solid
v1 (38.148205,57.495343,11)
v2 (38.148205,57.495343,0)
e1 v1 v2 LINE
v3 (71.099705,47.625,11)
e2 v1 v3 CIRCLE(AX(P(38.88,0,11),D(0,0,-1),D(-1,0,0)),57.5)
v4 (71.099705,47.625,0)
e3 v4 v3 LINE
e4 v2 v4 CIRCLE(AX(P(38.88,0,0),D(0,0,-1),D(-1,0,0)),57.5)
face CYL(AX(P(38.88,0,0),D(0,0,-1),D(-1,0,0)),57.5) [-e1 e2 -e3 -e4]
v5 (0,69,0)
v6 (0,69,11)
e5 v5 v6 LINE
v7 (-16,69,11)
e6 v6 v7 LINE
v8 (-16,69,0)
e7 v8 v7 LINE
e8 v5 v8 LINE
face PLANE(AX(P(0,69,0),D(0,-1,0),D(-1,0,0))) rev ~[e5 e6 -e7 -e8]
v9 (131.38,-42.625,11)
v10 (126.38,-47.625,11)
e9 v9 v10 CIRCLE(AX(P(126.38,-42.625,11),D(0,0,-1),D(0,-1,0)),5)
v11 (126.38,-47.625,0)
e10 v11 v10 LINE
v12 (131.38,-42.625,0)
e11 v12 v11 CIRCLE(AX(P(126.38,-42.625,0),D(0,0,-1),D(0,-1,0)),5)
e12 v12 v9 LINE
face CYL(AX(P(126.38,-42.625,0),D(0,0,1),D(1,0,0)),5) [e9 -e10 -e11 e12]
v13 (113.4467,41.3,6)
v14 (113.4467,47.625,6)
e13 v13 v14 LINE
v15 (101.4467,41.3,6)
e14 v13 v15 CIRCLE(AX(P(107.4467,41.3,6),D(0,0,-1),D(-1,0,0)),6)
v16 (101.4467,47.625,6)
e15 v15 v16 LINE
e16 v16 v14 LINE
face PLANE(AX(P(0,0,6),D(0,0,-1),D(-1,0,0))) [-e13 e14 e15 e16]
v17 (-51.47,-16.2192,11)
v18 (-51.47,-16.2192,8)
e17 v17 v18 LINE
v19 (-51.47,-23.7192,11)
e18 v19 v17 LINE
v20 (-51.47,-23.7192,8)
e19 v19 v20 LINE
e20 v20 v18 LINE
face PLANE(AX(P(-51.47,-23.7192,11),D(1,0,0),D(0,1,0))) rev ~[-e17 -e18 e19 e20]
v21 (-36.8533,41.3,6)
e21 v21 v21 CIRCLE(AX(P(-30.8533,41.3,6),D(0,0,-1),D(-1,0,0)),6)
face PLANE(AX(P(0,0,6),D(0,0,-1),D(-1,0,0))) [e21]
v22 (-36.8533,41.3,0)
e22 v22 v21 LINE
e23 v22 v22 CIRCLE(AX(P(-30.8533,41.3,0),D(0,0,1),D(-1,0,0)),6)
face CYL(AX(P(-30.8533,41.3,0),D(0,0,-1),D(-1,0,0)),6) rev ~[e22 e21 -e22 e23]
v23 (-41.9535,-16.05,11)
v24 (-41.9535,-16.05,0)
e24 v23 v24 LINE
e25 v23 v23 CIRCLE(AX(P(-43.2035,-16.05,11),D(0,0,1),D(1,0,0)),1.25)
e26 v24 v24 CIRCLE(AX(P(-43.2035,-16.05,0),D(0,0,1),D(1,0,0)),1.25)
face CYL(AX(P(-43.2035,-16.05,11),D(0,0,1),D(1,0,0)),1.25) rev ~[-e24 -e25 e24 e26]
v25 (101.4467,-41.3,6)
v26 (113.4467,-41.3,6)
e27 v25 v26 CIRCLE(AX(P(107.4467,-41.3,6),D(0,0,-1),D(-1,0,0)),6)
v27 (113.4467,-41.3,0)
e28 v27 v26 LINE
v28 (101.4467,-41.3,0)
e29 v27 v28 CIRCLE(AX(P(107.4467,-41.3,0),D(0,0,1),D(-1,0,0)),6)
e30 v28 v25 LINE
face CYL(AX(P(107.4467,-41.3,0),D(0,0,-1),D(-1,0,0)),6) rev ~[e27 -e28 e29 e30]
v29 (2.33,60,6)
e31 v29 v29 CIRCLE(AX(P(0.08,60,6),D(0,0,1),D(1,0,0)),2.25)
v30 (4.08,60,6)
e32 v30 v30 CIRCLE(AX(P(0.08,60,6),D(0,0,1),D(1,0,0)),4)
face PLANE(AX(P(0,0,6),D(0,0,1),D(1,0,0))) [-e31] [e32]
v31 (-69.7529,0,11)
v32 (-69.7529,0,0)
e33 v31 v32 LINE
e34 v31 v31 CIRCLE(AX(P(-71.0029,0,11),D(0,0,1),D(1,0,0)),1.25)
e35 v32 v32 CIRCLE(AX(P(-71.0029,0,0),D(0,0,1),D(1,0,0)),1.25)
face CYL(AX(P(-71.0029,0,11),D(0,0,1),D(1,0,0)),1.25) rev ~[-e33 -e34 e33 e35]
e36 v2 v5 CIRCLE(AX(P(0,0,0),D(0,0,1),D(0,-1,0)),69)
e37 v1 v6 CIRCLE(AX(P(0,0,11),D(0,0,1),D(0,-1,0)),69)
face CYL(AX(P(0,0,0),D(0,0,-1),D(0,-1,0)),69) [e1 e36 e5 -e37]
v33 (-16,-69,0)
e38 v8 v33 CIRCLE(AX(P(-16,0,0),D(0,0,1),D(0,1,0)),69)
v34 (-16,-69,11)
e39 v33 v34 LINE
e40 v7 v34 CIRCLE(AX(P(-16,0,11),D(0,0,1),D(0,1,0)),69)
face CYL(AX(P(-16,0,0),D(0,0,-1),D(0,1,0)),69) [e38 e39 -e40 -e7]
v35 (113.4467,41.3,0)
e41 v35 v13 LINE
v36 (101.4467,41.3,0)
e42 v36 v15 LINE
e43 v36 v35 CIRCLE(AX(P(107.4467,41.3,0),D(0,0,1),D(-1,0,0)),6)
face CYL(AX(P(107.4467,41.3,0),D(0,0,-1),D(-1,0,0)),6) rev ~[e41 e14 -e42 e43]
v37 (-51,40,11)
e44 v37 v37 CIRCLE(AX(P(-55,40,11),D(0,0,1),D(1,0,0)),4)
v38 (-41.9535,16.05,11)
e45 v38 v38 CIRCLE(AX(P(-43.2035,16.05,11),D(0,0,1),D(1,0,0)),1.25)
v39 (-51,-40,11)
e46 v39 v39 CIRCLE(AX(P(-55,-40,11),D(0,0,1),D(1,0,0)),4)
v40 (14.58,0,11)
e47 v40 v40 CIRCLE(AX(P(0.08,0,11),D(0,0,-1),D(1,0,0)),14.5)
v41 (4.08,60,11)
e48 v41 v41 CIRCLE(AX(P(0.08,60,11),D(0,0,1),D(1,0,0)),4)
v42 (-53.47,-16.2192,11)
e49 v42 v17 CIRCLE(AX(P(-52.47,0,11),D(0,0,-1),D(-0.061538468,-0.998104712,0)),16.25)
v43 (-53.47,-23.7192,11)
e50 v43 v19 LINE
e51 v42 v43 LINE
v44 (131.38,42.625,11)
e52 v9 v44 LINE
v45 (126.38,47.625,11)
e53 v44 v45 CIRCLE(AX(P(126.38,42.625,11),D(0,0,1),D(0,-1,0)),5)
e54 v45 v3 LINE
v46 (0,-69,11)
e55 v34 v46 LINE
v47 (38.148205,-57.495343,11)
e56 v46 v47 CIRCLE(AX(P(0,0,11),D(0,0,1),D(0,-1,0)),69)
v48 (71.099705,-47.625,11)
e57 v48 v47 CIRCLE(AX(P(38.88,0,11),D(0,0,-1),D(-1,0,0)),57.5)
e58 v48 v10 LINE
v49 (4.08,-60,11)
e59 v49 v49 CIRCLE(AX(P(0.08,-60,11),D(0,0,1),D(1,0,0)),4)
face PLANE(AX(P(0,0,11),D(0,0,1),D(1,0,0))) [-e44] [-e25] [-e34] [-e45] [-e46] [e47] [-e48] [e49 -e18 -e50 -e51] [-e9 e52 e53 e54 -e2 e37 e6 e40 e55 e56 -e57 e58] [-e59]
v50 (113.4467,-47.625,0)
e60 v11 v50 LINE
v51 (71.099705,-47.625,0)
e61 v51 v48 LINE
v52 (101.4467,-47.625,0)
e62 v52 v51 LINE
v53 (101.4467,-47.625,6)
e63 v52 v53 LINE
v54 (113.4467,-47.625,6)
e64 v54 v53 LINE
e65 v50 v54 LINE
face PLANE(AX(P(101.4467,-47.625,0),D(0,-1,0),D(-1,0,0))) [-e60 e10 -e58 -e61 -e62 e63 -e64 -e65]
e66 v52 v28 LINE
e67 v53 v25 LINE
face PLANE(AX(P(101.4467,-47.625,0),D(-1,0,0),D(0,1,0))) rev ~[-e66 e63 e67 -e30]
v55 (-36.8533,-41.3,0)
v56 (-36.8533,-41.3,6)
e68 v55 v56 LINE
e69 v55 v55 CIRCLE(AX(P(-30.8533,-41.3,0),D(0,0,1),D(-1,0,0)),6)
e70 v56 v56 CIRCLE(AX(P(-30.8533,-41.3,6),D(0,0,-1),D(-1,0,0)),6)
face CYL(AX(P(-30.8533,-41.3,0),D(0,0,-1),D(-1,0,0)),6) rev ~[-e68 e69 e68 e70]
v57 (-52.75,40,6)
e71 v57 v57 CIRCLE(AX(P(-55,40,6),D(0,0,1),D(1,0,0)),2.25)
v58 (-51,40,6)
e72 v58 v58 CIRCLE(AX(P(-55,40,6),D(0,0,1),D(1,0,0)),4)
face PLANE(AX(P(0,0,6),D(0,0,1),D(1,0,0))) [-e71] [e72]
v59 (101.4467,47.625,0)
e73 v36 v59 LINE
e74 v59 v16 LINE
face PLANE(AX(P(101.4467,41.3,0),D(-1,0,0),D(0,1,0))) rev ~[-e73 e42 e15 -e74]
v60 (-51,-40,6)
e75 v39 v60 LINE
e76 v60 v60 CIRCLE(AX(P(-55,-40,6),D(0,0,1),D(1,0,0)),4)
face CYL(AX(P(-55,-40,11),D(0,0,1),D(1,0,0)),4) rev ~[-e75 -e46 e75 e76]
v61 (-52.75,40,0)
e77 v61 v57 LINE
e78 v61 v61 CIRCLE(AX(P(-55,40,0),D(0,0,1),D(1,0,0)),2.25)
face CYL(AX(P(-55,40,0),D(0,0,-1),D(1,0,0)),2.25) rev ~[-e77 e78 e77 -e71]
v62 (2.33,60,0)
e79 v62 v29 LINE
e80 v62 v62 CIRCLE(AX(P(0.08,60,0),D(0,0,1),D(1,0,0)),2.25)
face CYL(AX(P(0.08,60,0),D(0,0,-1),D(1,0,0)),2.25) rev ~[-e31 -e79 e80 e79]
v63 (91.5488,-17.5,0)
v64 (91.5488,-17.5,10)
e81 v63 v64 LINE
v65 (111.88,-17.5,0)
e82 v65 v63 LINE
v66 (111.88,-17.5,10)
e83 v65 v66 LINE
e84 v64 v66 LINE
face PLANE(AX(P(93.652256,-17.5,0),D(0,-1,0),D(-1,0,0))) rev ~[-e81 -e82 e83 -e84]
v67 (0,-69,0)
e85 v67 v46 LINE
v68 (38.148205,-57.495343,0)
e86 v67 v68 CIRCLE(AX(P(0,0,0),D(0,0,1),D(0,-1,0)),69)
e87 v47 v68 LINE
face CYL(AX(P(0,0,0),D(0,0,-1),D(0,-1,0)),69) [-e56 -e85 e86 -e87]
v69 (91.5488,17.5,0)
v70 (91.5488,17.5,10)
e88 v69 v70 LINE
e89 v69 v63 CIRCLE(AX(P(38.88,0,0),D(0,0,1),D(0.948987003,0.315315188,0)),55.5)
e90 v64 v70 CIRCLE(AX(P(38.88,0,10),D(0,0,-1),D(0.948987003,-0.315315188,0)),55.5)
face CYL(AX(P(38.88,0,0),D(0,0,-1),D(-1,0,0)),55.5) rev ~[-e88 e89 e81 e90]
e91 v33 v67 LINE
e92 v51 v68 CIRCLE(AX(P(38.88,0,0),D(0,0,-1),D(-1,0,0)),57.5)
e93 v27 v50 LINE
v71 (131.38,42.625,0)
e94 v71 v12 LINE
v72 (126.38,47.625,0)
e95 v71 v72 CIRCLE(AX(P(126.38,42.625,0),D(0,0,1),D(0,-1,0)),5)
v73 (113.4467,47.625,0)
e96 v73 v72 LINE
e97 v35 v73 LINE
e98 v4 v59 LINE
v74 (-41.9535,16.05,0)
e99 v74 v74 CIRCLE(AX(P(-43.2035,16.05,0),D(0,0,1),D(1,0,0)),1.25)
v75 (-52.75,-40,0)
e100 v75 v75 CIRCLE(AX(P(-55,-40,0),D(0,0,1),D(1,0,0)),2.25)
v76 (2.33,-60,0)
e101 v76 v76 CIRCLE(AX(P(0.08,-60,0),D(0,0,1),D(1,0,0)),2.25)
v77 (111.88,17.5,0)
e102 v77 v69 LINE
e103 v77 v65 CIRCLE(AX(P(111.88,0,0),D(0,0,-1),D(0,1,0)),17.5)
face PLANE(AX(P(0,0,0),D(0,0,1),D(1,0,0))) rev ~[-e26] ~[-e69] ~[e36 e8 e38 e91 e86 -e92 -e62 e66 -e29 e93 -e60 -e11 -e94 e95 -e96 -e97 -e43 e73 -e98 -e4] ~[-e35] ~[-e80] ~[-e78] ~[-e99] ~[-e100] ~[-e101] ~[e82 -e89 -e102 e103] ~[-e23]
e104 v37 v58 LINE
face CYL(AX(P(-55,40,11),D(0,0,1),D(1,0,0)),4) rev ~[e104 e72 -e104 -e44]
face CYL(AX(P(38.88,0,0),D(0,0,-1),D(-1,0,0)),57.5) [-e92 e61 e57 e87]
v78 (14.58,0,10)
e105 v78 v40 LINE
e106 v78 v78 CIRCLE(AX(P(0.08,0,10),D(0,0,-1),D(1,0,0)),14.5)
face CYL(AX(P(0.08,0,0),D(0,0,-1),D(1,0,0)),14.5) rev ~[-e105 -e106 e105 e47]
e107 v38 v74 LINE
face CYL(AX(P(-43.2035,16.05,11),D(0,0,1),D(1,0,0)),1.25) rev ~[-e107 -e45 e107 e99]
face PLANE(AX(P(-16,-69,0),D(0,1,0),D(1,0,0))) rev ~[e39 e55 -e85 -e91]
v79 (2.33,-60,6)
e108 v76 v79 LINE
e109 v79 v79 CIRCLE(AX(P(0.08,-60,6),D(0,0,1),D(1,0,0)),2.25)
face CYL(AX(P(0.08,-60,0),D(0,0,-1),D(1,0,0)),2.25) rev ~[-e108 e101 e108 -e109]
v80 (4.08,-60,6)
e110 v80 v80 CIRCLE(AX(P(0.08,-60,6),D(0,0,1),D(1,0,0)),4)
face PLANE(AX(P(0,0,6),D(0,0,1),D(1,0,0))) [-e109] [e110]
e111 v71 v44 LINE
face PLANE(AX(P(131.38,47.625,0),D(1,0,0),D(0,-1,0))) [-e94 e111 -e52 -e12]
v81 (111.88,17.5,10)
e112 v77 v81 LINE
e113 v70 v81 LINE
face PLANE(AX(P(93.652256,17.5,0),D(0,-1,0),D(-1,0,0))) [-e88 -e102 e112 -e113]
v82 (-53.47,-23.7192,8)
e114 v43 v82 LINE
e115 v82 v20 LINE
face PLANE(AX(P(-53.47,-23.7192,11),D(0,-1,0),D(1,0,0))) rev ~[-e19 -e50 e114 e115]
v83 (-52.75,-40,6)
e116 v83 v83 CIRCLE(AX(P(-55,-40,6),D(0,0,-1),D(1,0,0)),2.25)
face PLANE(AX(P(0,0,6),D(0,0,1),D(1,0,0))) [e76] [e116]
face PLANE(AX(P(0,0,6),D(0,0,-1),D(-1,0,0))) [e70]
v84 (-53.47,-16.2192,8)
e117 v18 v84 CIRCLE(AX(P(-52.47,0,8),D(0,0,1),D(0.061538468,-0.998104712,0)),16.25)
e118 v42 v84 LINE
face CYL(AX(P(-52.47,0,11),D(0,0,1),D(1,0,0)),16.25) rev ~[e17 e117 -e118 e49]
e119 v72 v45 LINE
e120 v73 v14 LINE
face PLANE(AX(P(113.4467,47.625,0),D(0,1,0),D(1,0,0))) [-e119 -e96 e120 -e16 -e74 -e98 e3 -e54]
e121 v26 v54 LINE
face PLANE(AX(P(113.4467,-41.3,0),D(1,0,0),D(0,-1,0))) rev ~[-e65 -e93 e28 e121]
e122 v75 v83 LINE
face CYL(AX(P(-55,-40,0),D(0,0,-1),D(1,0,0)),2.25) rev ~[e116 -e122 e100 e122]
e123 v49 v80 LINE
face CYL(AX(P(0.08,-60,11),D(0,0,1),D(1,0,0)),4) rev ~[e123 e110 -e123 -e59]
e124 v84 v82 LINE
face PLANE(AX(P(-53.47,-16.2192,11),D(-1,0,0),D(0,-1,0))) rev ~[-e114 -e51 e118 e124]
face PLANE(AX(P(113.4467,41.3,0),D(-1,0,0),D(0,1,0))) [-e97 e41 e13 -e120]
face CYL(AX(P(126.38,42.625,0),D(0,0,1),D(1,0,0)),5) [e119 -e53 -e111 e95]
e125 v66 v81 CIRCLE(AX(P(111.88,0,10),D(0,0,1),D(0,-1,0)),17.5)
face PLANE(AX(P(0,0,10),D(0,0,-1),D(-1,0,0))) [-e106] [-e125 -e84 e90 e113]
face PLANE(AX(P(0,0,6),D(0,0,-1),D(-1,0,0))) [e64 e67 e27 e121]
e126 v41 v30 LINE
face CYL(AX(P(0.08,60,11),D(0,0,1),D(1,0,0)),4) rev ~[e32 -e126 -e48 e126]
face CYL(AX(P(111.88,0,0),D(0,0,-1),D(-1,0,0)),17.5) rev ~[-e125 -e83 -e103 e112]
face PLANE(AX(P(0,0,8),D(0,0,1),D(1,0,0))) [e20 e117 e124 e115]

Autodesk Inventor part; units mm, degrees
ref_plane "YZ Plane" through (0, 0, 0) normal (1, 0, 0) x (0, 1, 0)
ref_plane "XZ Plane" through (0, 0, 0) normal (0, 1, 0) x (-1, 0, 0)
ref_plane "XY Plane" through (0, 0, 0) normal (0, 0, 1) x (1, 0, 0)
sketch "Sketch1" plane through (0, 0, 0) normal (0, 0, 1) x (1, 0, 0)
  line L0 (-19.2849, 35) -> (-19.2849, -35) construction
  line L1 (19.7114, 54.5) -> (19.7114, -54.5) construction
  line L2 (-19.2849, 35) -> (19.7114, 54.5) construction
  line L3 (-19.2849, -35) -> (19.7114, -54.5) construction
  circle A0 centre (0.08, 0) radius 14.5
  line L4 (-19.2849, 35) -> (0.08, 0) construction
  line L5 (0.08, 0) -> (-19.2849, -35) construction
  circle A1 centre (19.7114, 54.5) radius 1.6 construction
  circle A2 centre (-19.2849, 35) radius 1.6 construction
  circle A3 centre (-19.2849, -35) radius 1.6 construction
  circle A4 centre (19.7114, -54.5) radius 1.6 construction
  line L6 (-16, -69) -> (0, -69)
  line L7 (0, 69) -> (-16, 69)
  arc A5 (-16, 69) -> (-16, -69) centre (-16, 0) ccw
  arc A6 (0, -69) -> (0, 69) centre (0, 0) ccw
  line L8 (-85, 0) -> (69, 0) construction
  circle A7 centre (-19.2849, 35) radius 3 construction
  circle A8 centre (-19.2849, -35) radius 3 construction
  circle A9 centre (19.7114, 54.5) radius 3 construction
  circle A10 centre (19.7114, -54.5) radius 3 construction
  line L9 (0.08, 60) -> (0.08, -60) construction
  line L10 (-55, -40) -> (-55, 40) construction
  circle A11 centre (-55, 40) radius 2.25
  circle A12 centre (-55, -40) radius 2.25
  circle A13 centre (0.08, -60) radius 2.25
  circle A14 centre (0.08, 60) radius 2.25
  point P0 (-19.2849, 0)
  point P1 (19.7114, 0)
  point P2 (-55, 0)
  dimension "d0" = 70
  dimension "d1" = 109
  dimension "d2" = 43.6
  dimension "d3" = 29
  dimension "d4" = 40
  dimension "d5" = 3.2
  dimension "d7" = 138
  dimension "d8" = 154
  dimension "d33" = 6
  dimension "d55" = 85.08
  dimension "d74" = 80
  dimension "d76" = 30
  dimension "d77" = 4.5
  dimension "d78" = 120
extrude "Extrusion1" add sketch "Sketch1" along normal blind 11 contours A5 L7 A6 L6 | A11 | A12 | A13 | A14
sketch "Sketch2" plane through (0, 0, 11) normal (0, 0, 1) x (1, 0, 0)
  circle A0 centre (-52.47, 0) radius 18.5329 construction
  circle A1 centre (-71.0029, 0) radius 1.25
  circle A2 centre (-43.2035, 16.05) radius 1.25
  circle A3 centre (-43.2035, -16.05) radius 1.25
  circle A4 centre (0.08, 0) radius 14.5 projected
  line L0 (-16, -69) -> (0, -69) projected
  arc A5 (0, -69) -> (0, 69) centre (0, 0) ccw projected
  line L1 (0, 69) -> (-16, 69) projected
  arc A6 (-16, 69) -> (-16, -69) centre (-16, 0) ccw projected
  arc A7 (-16, 69) -> (-16, -69) centre (-16, 0) ccw construction
  line L2 (-85, 0) -> (69, 0) construction
  circle A8 centre (-43.2035, -16.05) radius 5
  circle A9 centre (-43.2035, 16.05) radius 5
  circle A10 centre (-71.0029, 0) radius 5
  circle A11 centre (-52.47, 0) radius 16.25
  line L3 (-53.47, -16.2192) -> (-53.47, -23.7192)
  line L4 (-53.47, -23.7192) -> (-51.47, -23.7192)
  line L5 (-51.47, -23.7192) -> (-51.47, -16.2192)
  line L6 (-52.47, -23.7192) -> (-52.47, 0) construction
  arc A12 (-53.47, -16.2192) -> (-51.47, -16.2192) centre (-52.47, 0) ccw
  dimension "d67" = 32.5
  dimension "d11" = 120
  dimension "d12" = 120
  dimension "d13" = 32.1
  dimension "d14" = 52.55
  dimension "d40" = 2.5
  dimension "d49" = 10
  dimension "d97" = 7.5
  dimension "d98" = 2
sketch "Sketch3" plane through (0, 0, 0) normal (0, 0, -1) x (-1, 0, 0)
  circle A0 centre (30.8533, 41.3) radius 6
  circle A1 centre (-0.08, 0) radius 14.5 projected
  circle A2 centre (30.8533, -41.3) radius 6
  line L0 (30.8533, 41.3) -> (-0.08, 0) construction
  line L1 (-0.08, 0) -> (30.8533, -41.3) construction
  circle A3 centre (-38.88, 0) radius 55.5
  circle A4 centre (-0.08, 0) radius 14.5 construction
  line L2 (16, -69) -> (0, -69) construction
  arc A5 (16, -69) -> (16, 69) centre (16, 0) ccw construction
  line L3 (0, 69) -> (16, 69) construction
  arc A6 (0, 69) -> (0, -69) centre (0, 0) ccw construction
  arc A7 (16, -69) -> (16, 69) centre (16, 0) ccw construction
  line L4 (85, 0) -> (-129.38, 0) construction
  arc A8 (0, 69) -> (0, -69) centre (0, 0) ccw construction
  line L5 (30.8533, 41.3) -> (30.8533, -41.3)
  line L6 (37.1783, 47.625) -> (-131.38, 47.625)
  line L7 (-131.38, 47.625) -> (-131.38, -47.625)
  line L8 (-131.38, -47.625) -> (37.1783, -47.625)
  line L9 (37.1783, -47.625) -> (37.1783, 47.625)
  line L10 (30.8533, 41.3) -> (37.1783, 41.3) construction
  line L11 (30.8533, 41.3) -> (30.8533, 47.625) construction
  line L12 (30.8533, -41.3) -> (37.1783, -41.3) construction
  line L13 (30.8533, -41.3) -> (30.8533, -47.625) construction
  circle A9 centre (-107.4467, 41.3) radius 6
  circle A10 centre (-107.4467, -41.3) radius 6
  line L14 (30.8533, 41.3) -> (-107.4467, 41.3) construction
  line L15 (30.8533, -41.3) -> (-107.4467, -41.3) construction
  circle A11 centre (-111.88, 0) radius 17.5
  line L16 (-111.88, 17.5) -> (-91.5488, 17.5)
  line L17 (-111.88, -17.5) -> (-91.5488, -17.5)
  circle A12 centre (-38.88, 0) radius 57.5
  line L18 (-131.38, 0) -> (-129.38, 0)
  line L19 (-111.88, 17.5) -> (-111.88, -17.5) construction
  line L20 (-113.4467, 41.3) -> (-113.4467, 47.625)
  line L21 (-101.4467, 41.3) -> (-101.4467, 47.625)
  line L22 (-113.4467, 41.3) -> (-101.4467, 41.3)
  line L23 (-113.4467, 47.625) -> (-101.4467, 47.625)
  line L24 (-113.4467, -41.3) -> (-113.4467, -47.625)
  line L25 (-113.4467, -47.625) -> (-101.4467, -47.625)
  line L26 (-101.4467, -47.625) -> (-101.4467, -41.3)
  line L27 (-101.4467, -41.3) -> (-113.4467, -41.3)
  dimension "d15" = 51.6
  dimension "d17" = 111
  dimension "d18" = 82.6
  dimension "d22" = 95.25
  dimension "d29" = 138.3
  dimension "d30" = 35
  dimension "d59" = 2
  dimension "d60" = 12
  dimension "d81" = 2
  dimension "d99" = 38.8
extrude "Extrusion4" add sketch "Sketch3" against normal up to surface (11 mm away)
extrude "Extrusion14" cut sketch "Sketch3" against normal blind 6 contours A0 | A2 | L22 A9 | A9 L22 | L27 A10 | A10 L27
extrude "Extrusion15" cut sketch "Sketch3" against normal blind 10 contours A3 L6 L8 | A3 A11 A12 L16 | A11 A12 | A3 L17 A12 A11 | A3 L6 | A12 A11 L16 | A12 A11 | A12 L17 A11 | L8 A3
extrude "Extrusion16" cut sketch "Sketch2" against normal through all contours A1 | A2 | A3
extrude "Extrusion17" cut sketch "Sketch2" against normal blind 3 contours A11 A8 | A8 A11 A10 A9 | L5 L4 L3 A11 | A9 A11 | A11 A10 picked at (-44.8177, -13.2541) picked at (-44.8177, 13.2541) picked at (-67.7746, 0)
fillet "Fillet1" radius 5 1 edges at (131.38, -47.625, 5.5)
fillet "Fillet2" radius 5 1 edges at (131.38, 47.625, 5.5)
extrude "Extrusion20" cut sketch "Sketch1" along normal through all contours A11 | A12 | A13 | A14
sketch "Sketch10" plane through (0, 0, 11) normal (0, 0, 1) x (1, 0, 0)
  circle A0 centre (0.08, -60) radius 2.25 projected
  circle A1 centre (0.08, 60) radius 2.25 projected
  circle A2 centre (-55, 40) radius 2.25 projected
  circle A3 centre (-55, -40) radius 4
  circle A4 centre (0.08, -60) radius 4
  circle A5 centre (0.08, 60) radius 2.25 projected
  circle A6 centre (0.08, 60) radius 4
  circle A7 centre (-55, 40) radius 4
  point P0 (0, 0)
  dimension "d88" = 8
extrude "Extrusion21" cut sketch "Sketch10" against normal blind 5
thread "Thread1" size "M3x0.5" class "6H" standard "ANSI Metric M Profile" full length
thread "Thread2" size "M3x0.5" class "6H" standard "ANSI Metric M Profile" full length
thread "Thread3" size "M3x0.5" class "6H" standard "ANSI Metric M Profile" full length
extrude "Extrusion22" cut sketch "Sketch3" against normal up to surface (6 mm away) contours L21 A9 L20 L6 | L8 L24 A10 L26
properties part number "AZ-FLDIC-FWup bottom adapter"
